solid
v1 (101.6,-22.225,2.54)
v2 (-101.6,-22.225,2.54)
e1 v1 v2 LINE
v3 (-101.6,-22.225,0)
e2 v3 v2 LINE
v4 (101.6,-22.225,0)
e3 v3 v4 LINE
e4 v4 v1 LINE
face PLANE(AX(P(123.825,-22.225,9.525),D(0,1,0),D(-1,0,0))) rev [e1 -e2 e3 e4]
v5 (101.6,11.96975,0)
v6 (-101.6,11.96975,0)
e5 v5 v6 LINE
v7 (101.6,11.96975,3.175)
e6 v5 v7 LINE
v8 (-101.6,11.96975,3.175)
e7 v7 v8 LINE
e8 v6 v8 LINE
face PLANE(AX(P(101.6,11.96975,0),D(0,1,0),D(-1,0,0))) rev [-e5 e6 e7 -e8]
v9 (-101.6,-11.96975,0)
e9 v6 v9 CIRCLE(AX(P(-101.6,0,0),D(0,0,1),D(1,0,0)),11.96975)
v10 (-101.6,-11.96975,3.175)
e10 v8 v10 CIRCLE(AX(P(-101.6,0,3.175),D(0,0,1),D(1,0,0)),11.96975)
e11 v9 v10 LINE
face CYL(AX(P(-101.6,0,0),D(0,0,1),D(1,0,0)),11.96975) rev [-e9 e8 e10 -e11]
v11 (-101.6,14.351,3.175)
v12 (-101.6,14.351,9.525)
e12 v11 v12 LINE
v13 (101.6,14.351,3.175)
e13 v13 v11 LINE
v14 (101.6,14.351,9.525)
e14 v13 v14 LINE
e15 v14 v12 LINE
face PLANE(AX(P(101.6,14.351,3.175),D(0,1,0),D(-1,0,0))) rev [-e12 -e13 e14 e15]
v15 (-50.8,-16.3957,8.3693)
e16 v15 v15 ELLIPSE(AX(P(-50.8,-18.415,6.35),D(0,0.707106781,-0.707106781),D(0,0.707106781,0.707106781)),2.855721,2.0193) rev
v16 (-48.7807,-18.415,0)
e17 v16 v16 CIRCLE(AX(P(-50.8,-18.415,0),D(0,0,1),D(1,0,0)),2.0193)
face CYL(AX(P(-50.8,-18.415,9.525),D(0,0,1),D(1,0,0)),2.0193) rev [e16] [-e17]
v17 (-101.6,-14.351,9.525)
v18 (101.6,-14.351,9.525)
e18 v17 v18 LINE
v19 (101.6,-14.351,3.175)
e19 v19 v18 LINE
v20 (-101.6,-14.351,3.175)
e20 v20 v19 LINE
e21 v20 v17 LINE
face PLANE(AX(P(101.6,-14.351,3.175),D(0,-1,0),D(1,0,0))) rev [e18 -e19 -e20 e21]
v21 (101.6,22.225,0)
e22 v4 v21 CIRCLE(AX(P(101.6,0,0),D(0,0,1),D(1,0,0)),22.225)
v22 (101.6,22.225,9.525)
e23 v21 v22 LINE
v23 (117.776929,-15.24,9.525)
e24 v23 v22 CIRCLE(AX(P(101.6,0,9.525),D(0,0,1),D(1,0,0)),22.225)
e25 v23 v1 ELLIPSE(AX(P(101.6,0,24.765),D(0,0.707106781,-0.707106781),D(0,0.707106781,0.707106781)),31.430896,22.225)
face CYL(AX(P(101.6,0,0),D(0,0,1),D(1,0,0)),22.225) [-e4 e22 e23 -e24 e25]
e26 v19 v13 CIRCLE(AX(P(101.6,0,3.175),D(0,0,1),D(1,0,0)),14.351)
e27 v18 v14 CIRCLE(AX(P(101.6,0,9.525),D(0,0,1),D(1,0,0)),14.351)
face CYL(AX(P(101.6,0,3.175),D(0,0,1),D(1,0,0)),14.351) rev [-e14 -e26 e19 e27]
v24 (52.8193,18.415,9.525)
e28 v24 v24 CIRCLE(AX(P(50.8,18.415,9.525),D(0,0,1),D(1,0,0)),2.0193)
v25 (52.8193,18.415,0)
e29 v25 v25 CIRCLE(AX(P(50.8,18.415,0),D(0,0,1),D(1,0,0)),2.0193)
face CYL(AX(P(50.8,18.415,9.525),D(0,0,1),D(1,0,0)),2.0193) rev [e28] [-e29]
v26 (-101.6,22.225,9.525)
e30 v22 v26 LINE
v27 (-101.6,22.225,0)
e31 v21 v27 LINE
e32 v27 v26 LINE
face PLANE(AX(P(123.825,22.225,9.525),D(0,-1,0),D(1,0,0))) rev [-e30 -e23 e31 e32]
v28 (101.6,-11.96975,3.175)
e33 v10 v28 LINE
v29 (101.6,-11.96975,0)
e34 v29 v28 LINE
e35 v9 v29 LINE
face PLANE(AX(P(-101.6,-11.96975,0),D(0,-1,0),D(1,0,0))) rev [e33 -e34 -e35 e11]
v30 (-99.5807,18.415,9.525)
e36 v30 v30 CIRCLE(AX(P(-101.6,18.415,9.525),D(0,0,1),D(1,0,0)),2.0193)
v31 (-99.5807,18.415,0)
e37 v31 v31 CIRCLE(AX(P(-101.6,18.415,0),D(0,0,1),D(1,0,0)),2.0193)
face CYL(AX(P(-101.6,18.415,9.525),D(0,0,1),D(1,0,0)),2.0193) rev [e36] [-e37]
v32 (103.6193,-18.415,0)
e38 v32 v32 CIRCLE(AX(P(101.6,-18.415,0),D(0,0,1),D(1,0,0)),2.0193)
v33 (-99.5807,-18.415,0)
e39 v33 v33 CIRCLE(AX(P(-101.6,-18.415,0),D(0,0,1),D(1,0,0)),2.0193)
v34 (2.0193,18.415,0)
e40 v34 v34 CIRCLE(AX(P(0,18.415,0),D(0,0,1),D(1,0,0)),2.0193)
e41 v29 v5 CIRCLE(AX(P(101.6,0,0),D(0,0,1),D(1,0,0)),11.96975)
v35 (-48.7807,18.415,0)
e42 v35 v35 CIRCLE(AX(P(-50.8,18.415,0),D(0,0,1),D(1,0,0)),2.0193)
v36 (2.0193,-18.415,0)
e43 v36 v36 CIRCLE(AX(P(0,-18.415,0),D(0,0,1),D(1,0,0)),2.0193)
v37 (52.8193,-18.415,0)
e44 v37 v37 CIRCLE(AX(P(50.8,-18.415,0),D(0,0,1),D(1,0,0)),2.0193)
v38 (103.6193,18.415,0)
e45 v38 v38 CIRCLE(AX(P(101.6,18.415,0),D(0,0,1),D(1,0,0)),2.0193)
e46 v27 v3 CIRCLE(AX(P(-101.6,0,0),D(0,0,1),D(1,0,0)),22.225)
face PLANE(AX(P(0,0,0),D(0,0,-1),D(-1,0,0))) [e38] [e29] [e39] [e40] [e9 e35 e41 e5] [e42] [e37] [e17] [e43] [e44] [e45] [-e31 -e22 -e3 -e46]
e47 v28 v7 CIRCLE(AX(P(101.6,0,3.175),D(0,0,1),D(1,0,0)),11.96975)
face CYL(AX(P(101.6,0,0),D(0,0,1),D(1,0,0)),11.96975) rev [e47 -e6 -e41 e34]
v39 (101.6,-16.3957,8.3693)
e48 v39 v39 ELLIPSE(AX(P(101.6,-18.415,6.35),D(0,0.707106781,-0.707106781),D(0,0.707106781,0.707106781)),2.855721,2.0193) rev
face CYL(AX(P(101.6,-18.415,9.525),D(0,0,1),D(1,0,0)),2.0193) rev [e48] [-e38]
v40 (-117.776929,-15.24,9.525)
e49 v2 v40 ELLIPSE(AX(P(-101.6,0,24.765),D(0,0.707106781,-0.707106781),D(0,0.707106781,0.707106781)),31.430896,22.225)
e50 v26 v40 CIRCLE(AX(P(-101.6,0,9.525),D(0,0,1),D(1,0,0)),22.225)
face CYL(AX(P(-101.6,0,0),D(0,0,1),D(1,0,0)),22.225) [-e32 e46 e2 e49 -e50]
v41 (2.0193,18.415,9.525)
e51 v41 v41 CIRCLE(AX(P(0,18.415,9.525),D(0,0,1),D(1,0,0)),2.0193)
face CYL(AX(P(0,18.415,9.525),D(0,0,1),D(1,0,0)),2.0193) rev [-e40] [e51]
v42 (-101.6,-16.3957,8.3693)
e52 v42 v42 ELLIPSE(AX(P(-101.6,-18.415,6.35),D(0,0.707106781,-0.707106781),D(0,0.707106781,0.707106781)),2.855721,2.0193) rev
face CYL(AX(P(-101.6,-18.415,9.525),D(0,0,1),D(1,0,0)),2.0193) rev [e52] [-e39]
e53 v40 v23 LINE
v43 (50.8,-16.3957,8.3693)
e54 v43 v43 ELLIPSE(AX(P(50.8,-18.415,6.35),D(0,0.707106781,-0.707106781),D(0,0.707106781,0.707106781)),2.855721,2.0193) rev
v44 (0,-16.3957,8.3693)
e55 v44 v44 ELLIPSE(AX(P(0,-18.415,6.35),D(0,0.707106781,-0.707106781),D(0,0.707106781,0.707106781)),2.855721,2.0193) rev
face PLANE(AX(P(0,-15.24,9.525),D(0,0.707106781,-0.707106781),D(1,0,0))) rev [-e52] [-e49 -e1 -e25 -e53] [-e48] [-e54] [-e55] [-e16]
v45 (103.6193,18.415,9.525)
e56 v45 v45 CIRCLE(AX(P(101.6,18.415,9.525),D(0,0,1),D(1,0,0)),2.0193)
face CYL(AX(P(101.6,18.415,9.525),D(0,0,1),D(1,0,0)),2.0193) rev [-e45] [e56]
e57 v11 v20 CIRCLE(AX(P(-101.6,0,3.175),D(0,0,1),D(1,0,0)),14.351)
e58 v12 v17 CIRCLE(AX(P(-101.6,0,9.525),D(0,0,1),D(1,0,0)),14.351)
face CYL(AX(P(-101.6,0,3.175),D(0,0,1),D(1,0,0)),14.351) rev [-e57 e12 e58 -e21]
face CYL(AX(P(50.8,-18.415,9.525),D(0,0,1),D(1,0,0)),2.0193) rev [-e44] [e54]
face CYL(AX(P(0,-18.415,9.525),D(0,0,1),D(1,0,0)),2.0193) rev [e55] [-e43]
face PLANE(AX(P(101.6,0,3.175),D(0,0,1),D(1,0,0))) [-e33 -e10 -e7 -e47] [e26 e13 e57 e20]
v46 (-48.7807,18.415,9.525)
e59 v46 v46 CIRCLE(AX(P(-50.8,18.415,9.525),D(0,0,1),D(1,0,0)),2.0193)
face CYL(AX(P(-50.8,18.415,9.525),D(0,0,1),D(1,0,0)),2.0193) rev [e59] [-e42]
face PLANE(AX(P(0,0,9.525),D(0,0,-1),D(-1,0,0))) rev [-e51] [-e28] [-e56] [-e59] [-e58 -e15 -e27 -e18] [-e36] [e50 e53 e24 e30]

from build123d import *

# Parameters (mm, degrees)
SKETCH1_W              = 247.65
SKETCH1_H              = 44.45
BOSS_EXTRUDE1_DEPTH    = 9.525
CUT_EXTRUDE1_DEPTH     = 6.35
CUT_EXTRUDE3_DEPTH     = 126.963898598
CUT_EXTRUDE2_DEPTH     = 127.163809688
F_10_32_TAPPED_HOLE1_D = 4.0386
CHAMFER2_SIZE          = 6.985


with BuildPart() as part:
    # Sketch1 → Boss-Extrude1 (new body)
    with BuildSketch(Plane.XY):
        Rectangle(SKETCH1_W, SKETCH1_H)
    extrude(amount=BOSS_EXTRUDE1_DEPTH)

    # Sketch2 → Cut-Extrude1 (cut)
    with BuildSketch(Plane.XY.offset(9.525)):
        with BuildLine():
            Line((101.6, -14.351), (-101.6, -14.351))
            ThreePointArc((-101.6, -14.351), (-115.951, 0), (-101.6, 14.351))
            Line((-101.6, 14.351), (101.6, 14.351))
            ThreePointArc((101.6, 14.351), (115.951, 0), (101.6, -14.351))
        make_face()
    extrude(amount=-CUT_EXTRUDE1_DEPTH, mode=Mode.SUBTRACT)

    # Sketch14 → Cut-Extrude3 (cut, through all)
    with BuildSketch(Plane.XY.offset(3.175)):
        with BuildLine():
            Line((101.6, 11.96975), (-101.6, 11.96975))
            ThreePointArc((-101.6, 11.96975), (-113.56975, 0), (-101.6, -11.96975))
            Line((-101.6, -11.96975), (101.6, -11.96975))
            ThreePointArc((101.6, -11.96975), (113.56975, 0), (101.6, 11.96975))
        make_face()
    extrude(amount=-CUT_EXTRUDE3_DEPTH, mode=Mode.SUBTRACT)

    # Sketch3 → Cut-Extrude2 (cut, through all)
    with BuildSketch(Plane.XY.offset(9.525)):
        with BuildLine():
            ThreePointArc((-123.825, -1.74e-07), (-117.315448274, 15.71544815), (-101.6, 22.225))
            Line((-101.6, 22.225), (-123.825, 22.225))
            Line((-123.825, 22.225), (-123.825, -1.74e-07))
        make_face()
        with BuildLine():
            ThreePointArc((-101.6, -22.225), (-117.31544815, -15.715448274), (-123.825, -1.74e-07))
            Line((-123.825, -1.74e-07), (-123.825, -22.225))
            Line((-123.825, -22.225), (-101.6, -22.225))
        make_face()
        with BuildLine():
            Line((123.825, -22.225), (123.825, -6.4e-08))
            ThreePointArc((123.825, -6.4e-08), (117.315448189, -15.715448235), (101.6, -22.225))
            Line((101.6, -22.225), (123.825, -22.225))
        make_face()
        with BuildLine():
            Line((123.825, 22.225), (101.6, 22.225))
            ThreePointArc((101.6, 22.225), (117.315448235, 15.715448189), (123.825, -6.4e-08))
            Line((123.825, -6.4e-08), (123.825, 22.225))
        make_face()
    extrude(amount=-CUT_EXTRUDE2_DEPTH, mode=Mode.SUBTRACT)

    # #10-32 Tapped Hole1 (through all)
    with Locations(Plane.XY.offset(9.525)):
        with Locations((-101.6, 18.415), (-50.8, 18.415), (0, 18.415), (50.8, 18.415), (101.6, 18.415), (101.6, -18.415), (50.8, -18.415), (0, -18.415), (-50.8, -18.415), (-101.6, -18.415)):
            Hole(F_10_32_TAPPED_HOLE1_D / 2)

    # Chamfer2
    # the kernel refuses this chamfer: 6.985 mm, written as the material it takes off along each edge
    with BuildSketch(Plane(origin=(-119.563205671, -22.225, 9.525), x_dir=(0, 0.9996219169112968, 0.027495876610586303), z_dir=(1, 0, 0))) as chamfer2_piece_1:
        Polygon((CHAMFER2_SIZE * 0.999621916911, -CHAMFER2_SIZE * 0.0274958766106), (-CHAMFER2_SIZE * 0.0274958766106, -CHAMFER2_SIZE * 0.999621916911), (0, 0), align=None)
    extrude(amount=239.126411342, mode=Mode.SUBTRACT)


solid = part.part
